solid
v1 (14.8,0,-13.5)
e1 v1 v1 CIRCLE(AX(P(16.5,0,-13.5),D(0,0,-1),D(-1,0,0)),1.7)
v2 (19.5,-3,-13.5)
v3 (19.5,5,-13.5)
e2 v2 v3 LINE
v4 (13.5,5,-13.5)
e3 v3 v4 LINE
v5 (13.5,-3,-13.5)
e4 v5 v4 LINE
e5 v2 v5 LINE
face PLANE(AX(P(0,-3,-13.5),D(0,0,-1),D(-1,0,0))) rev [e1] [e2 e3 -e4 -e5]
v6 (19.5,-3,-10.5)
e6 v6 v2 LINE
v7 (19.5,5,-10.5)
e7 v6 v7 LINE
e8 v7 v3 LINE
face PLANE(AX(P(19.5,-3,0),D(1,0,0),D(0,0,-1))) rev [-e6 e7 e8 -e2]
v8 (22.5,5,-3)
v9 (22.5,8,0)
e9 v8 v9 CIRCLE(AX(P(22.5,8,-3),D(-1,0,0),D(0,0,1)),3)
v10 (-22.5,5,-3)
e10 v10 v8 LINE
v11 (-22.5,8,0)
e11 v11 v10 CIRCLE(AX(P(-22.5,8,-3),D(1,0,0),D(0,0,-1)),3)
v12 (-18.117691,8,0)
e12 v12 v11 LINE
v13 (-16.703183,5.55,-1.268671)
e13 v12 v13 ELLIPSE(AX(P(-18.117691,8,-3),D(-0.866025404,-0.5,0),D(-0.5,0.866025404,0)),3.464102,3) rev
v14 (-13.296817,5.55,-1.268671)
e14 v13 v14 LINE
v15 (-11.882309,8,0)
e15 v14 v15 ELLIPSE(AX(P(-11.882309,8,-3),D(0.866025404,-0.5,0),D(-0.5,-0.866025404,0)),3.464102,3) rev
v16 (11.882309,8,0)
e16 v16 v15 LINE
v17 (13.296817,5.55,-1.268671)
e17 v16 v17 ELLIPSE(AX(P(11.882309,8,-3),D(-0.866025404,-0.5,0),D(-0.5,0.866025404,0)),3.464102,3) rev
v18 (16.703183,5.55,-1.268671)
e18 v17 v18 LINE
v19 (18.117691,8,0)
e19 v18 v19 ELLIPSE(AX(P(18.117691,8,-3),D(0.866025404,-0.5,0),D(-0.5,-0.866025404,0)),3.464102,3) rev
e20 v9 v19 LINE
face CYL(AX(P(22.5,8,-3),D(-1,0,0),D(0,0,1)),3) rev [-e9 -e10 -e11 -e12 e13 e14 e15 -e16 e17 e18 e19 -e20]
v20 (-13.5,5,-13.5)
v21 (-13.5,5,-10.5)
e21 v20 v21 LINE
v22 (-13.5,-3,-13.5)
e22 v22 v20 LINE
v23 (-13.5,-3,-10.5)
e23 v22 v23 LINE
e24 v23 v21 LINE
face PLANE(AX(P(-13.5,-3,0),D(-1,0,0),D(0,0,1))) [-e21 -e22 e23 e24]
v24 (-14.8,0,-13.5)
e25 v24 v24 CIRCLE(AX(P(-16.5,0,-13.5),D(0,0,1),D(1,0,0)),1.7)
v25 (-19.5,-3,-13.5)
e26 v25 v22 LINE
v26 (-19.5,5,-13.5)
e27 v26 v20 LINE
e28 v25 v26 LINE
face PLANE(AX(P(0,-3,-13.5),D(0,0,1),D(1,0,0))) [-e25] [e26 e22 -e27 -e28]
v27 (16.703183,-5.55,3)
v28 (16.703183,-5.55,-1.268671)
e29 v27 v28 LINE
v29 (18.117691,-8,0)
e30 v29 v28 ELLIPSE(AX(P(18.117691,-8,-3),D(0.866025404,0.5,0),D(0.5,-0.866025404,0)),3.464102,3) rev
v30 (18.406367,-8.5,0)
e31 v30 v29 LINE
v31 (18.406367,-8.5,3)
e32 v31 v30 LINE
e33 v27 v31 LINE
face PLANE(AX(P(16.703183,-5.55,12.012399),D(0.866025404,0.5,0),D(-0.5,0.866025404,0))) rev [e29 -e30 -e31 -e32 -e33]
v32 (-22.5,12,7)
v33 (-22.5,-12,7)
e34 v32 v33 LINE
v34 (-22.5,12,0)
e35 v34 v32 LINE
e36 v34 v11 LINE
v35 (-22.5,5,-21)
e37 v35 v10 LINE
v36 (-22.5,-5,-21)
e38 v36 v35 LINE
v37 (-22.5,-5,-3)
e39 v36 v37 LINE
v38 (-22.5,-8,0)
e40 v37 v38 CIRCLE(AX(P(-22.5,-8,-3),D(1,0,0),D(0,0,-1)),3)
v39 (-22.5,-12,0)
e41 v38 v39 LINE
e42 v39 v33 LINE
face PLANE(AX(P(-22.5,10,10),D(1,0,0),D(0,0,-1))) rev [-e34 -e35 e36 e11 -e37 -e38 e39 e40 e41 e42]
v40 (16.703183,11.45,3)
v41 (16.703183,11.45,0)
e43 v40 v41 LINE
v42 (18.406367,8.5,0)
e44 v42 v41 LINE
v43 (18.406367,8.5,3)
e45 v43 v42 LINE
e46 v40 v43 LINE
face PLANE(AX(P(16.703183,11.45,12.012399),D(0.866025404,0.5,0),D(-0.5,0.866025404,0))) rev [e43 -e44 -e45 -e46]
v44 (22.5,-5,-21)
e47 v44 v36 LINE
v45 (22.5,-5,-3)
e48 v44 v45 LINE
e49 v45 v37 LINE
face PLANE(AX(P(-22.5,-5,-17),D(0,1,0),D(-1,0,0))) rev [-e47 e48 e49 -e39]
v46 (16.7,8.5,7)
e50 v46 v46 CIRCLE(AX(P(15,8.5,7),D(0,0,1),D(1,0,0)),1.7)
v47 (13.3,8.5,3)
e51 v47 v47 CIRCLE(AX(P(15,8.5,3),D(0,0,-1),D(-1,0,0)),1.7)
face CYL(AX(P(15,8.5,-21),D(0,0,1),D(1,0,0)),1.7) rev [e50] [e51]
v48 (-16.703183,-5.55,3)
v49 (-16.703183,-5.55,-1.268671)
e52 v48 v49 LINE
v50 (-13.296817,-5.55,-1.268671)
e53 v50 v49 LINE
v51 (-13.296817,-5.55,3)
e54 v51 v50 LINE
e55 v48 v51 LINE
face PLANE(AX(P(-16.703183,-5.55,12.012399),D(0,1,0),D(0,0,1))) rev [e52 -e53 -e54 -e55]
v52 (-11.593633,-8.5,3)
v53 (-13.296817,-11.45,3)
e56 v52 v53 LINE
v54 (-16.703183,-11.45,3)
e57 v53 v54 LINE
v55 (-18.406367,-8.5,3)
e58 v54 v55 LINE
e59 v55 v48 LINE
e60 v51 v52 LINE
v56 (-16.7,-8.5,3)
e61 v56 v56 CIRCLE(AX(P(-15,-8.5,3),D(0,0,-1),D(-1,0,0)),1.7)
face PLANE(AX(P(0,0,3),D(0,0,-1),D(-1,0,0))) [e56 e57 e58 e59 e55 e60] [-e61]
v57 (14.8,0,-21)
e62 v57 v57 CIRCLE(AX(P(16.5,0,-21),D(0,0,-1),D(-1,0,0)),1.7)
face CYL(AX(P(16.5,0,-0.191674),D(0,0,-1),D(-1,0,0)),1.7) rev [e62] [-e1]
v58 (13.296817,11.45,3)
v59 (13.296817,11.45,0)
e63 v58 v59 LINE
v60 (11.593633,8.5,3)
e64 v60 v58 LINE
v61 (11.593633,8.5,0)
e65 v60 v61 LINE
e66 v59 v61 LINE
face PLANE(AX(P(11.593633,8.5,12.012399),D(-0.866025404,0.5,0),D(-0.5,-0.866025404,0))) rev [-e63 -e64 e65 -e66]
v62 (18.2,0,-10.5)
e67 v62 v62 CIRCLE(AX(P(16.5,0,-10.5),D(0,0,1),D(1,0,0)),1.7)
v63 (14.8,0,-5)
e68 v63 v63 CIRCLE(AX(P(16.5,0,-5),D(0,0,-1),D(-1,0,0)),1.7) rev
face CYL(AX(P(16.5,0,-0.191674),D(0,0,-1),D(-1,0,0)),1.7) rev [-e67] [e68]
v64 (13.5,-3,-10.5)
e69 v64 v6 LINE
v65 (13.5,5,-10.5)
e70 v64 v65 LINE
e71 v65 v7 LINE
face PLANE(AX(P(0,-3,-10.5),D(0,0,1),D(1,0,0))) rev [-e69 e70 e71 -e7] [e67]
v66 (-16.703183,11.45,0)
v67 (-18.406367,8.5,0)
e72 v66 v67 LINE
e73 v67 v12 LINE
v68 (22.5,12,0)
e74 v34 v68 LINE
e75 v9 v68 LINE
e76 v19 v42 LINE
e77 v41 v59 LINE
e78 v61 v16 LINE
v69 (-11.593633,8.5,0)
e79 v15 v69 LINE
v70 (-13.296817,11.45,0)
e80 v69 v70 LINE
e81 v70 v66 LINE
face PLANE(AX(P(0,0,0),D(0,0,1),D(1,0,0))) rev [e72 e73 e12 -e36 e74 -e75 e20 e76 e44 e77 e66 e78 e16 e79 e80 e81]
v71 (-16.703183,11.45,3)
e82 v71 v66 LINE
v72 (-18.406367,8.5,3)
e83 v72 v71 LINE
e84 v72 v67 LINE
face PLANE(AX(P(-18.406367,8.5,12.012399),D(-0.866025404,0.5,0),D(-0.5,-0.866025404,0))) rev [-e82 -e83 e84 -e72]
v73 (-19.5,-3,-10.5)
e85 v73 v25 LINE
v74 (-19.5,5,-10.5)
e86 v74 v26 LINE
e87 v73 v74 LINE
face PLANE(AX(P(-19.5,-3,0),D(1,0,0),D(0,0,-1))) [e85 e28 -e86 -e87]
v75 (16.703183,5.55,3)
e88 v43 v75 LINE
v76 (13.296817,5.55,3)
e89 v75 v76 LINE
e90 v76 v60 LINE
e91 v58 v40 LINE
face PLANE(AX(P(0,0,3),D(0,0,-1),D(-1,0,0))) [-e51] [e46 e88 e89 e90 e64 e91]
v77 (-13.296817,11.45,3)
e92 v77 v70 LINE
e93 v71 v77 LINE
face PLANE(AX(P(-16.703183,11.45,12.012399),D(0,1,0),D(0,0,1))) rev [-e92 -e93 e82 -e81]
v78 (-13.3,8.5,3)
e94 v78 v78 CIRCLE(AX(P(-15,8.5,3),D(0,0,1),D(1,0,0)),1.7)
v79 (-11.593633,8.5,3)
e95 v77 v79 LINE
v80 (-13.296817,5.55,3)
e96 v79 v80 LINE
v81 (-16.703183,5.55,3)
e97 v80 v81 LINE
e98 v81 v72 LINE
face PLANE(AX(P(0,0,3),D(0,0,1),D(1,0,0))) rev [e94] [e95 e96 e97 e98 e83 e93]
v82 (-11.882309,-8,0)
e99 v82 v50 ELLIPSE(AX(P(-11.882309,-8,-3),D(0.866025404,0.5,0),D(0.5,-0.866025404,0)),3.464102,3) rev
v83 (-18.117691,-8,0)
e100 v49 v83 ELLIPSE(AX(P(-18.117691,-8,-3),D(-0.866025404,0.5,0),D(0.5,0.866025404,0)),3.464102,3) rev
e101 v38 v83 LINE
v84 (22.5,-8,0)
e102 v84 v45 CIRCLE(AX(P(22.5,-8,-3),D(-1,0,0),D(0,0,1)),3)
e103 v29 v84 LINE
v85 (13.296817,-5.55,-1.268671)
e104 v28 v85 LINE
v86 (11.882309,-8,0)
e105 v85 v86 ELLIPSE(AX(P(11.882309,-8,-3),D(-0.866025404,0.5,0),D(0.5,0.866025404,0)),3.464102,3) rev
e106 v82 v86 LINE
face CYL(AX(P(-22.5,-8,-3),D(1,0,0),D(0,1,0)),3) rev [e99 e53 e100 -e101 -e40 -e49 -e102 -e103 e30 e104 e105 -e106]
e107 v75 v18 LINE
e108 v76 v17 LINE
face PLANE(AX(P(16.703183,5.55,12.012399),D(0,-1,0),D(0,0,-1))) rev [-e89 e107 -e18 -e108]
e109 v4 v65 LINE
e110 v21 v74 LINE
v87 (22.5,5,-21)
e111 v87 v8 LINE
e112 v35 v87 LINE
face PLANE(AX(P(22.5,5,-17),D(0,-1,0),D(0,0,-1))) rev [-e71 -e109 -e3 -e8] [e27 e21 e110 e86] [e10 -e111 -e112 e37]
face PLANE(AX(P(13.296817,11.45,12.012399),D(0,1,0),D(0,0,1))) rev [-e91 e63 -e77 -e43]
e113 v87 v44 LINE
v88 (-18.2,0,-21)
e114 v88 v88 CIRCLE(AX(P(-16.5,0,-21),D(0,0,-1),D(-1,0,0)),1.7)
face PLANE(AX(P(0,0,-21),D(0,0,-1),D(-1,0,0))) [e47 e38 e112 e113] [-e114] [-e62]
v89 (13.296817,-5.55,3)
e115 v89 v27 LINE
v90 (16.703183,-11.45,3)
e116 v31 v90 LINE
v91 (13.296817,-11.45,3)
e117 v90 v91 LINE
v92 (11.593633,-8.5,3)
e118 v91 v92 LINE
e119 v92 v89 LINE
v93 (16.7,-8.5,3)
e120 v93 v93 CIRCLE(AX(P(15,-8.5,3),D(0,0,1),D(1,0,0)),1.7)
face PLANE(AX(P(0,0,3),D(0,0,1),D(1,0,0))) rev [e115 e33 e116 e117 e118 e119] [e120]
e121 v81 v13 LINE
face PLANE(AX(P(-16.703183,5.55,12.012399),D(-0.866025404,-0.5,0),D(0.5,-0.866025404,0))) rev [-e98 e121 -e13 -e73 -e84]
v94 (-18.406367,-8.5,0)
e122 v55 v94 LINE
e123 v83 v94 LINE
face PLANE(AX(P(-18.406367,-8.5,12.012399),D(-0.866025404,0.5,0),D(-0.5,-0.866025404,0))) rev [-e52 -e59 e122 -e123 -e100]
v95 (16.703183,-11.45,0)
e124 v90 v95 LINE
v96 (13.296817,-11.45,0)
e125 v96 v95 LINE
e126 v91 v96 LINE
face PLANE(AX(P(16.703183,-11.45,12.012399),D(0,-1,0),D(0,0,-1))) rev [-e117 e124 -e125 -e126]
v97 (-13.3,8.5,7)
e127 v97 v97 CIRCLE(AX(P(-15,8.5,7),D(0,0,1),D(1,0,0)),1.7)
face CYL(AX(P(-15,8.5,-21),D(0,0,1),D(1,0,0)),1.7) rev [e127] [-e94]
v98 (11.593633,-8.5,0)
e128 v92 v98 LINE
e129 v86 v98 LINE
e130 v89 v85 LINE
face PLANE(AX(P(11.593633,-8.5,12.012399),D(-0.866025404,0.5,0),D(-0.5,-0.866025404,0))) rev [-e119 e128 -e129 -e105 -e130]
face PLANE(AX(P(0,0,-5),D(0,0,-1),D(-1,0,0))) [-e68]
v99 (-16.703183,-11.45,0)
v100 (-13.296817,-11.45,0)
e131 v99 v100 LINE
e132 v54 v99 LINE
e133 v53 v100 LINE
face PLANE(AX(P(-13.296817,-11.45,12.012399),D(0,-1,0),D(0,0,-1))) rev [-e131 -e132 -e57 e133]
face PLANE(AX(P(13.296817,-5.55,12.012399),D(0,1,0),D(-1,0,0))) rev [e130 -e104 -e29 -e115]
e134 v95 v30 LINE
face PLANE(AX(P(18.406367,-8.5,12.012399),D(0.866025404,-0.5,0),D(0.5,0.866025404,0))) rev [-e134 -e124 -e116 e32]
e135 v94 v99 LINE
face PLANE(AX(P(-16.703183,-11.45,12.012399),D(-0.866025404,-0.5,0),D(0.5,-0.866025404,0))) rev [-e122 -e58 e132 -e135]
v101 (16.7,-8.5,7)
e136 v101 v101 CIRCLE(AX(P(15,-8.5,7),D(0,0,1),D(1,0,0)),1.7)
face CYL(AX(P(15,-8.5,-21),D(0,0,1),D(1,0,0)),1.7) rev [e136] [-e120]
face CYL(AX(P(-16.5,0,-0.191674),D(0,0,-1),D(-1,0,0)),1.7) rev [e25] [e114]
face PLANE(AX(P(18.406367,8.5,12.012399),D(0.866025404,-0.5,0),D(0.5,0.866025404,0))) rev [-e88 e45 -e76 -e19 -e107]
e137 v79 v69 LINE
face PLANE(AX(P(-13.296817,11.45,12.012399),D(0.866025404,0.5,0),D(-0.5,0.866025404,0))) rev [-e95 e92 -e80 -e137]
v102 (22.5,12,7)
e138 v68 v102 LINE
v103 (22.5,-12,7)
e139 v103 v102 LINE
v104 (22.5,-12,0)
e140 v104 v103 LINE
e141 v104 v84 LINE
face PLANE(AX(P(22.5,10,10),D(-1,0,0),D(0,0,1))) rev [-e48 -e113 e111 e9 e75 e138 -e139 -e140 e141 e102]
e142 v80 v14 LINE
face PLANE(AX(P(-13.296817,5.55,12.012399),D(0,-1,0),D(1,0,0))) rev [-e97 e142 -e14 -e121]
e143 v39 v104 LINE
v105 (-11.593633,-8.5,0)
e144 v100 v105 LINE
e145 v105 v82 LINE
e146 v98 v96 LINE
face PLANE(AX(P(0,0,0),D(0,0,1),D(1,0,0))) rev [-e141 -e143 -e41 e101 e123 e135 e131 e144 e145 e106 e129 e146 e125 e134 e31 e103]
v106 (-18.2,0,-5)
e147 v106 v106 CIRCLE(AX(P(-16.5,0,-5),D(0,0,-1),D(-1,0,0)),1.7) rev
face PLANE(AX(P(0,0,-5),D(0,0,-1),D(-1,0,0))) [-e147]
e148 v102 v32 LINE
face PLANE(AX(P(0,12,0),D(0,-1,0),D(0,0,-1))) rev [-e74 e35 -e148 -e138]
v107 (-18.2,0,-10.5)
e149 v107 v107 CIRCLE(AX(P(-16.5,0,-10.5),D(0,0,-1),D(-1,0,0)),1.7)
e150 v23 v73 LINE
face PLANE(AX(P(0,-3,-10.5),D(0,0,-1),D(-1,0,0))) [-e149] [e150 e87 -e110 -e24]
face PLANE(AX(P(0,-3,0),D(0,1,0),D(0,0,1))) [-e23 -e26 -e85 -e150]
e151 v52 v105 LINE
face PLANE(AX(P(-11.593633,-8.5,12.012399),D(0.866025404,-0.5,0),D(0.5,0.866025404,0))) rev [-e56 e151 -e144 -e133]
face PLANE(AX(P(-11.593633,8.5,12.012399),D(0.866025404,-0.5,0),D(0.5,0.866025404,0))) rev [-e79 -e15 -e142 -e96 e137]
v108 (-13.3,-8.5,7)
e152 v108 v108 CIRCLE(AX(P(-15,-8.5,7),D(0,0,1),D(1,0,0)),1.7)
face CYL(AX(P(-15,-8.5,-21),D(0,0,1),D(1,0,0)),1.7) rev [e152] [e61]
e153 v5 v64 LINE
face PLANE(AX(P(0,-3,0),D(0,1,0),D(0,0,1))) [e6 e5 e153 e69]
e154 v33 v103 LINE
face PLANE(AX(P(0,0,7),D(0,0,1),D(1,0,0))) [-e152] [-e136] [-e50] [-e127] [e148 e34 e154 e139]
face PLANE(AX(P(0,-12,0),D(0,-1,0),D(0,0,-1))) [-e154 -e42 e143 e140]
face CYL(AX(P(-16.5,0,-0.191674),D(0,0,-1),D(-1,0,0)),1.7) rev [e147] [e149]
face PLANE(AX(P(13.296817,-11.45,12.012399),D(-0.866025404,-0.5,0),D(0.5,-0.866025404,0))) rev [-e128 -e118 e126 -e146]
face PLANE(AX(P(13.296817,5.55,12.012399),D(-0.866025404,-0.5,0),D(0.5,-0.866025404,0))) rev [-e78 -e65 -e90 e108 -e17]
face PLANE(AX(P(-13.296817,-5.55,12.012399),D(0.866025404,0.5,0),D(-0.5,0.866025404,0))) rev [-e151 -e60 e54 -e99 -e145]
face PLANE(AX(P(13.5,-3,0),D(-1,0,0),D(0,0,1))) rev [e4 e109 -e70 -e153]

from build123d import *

# Parameters (mm, degrees)
SKETCH_1_W          = 45
SKETCH_1_H          = 20
EXTRUDE_1_DEPTH     = 10
EXTRUDE_2_DEPTH     = 17
SKETCH_3_W          = 45
SKETCH_3_H          = 2
EXTRUDE_3_DEPTH     = 10
SKETCH_5_R          = 1.5
CUT_EXTRUDE_1_DEPTH = 31.647185841
CUT_EXTRUDE_3_DEPTH = 3
FILLET_4_R          = 3
FILLET_5_R          = 3
SKETCH_9_W          = 45
SKETCH_9_H          = 24
CUT_EXTRUDE_4_DEPTH = 3
SKETCH_10_W         = 45
SKETCH_10_H         = 10
EXTRUDE_4_DEPTH     = 3
SKETCH_12_R         = 1.55
CUT_EXTRUDE_5_DEPTH = 15
CUT_EXTRUDE_6_DEPTH = 8
EXTRUDE_START       = 1
SKETCH_15_W         = 45
SKETCH_15_H         = 10
SKETCH_15_R         = 1.55
EXTRUDE_5_DEPTH     = 1
SKETCH_16_R         = 1.7
CUT_EXTRUDE_7_DEPTH = 38.871493237
CUT_EXTRUDE_8_DEPTH = 24
CUT_EXTRUDE_9_REACH = 39.871
SKETCH_18_R         = 1.7


with BuildPart() as part:
    # Эскиз1 → Бобышка-Вытянуть1 (new body)
    with BuildSketch(Plane.XY):
        Rectangle(SKETCH_1_W, SKETCH_1_H)
    extrude(amount=EXTRUDE_1_DEPTH)

    # Эскиз2 → Бобышка-Вытянуть2 (add)
    with BuildSketch(Plane(origin=(0, 0, 0), x_dir=(-1, 0, 0), z_dir=(0, 0, -1))):
        Polygon((-22.5, 0), (-22.5, 5), (22.5, 5), (22.5, -5), (-22.5, -5), align=None)
    extrude(amount=EXTRUDE_2_DEPTH)

    # Эскиз3 → Бобышка-Вытянуть3 (add)
    with BuildSketch(Plane.XY.offset(10)):
        with Locations((0, 11)):
            Rectangle(SKETCH_3_W, SKETCH_3_H)
        with Locations((0, -11)):
            Rectangle(SKETCH_3_W, SKETCH_3_H)
    extrude(amount=-EXTRUDE_3_DEPTH)

    # Эскиз5 → Вырез-Вытянуть1 (cut, through all)
    with BuildSketch(Plane(origin=(0, 0, 0), x_dir=(-1, 0, 0), z_dir=(0, 0, -1))):
        with Locations((-15, 8.5)):
            Circle(SKETCH_5_R)
        with Locations((15, 8.5)):
            Circle(SKETCH_5_R)
        with Locations((15, -8.5)):
            Circle(SKETCH_5_R)
        with Locations((-15, -8.5)):
            Circle(SKETCH_5_R)
    extrude(amount=-CUT_EXTRUDE_1_DEPTH, mode=Mode.SUBTRACT)

    # Эскиз8 → Вырез-Вытянуть3 (cut)
    with BuildSketch(Plane(origin=(0, 0, 0), x_dir=(-1, 0, 0), z_dir=(0, 0, -1))):
        Polygon((-11.824573519, 8.5), (-13.41228676, 11.25), (-16.58771324, 11.25), (-18.175426481, 8.5), (-16.58771324, 5.75), (-13.41228676, 5.75), align=None)
        Polygon((-13.41228676, -5.75), (-11.824573519, -8.5), (-13.41228676, -11.25), (-16.58771324, -11.25), (-18.175426481, -8.5), (-16.58771324, -5.75), align=None)
        Polygon((11.824573519, -8.5), (13.41228676, -11.25), (16.58771324, -11.25), (18.175426481, -8.5), (16.58771324, -5.75), (13.41228676, -5.75), align=None)
        Polygon((13.41228676, 5.75), (11.824573519, 8.5), (13.41228676, 11.25), (16.58771324, 11.25), (18.175426481, 8.5), (16.58771324, 5.75), align=None)
    extrude(amount=-CUT_EXTRUDE_3_DEPTH, mode=Mode.SUBTRACT)

    # Скругление4
    # the kernel refuses this fillet: 3 mm, written as the material it adds along each edge
    with BuildSketch(Plane(origin=(22.5, 5, 0), x_dir=(0, 1, 0), z_dir=(-1, 0, 0))) as fillet_4_piece_1_section:
        with BuildLine():
            CenterArc((FILLET_4_R, FILLET_4_R), FILLET_4_R, 180, 90)
            Line((0, FILLET_4_R), (0, 0))
            Line((0, 0), (FILLET_4_R, 0))
        make_face()
    fillet_4_piece_1 = extrude(amount=52.5, mode=Mode.PRIVATE)
    fillet_4_piece_1 = split(fillet_4_piece_1, bisect_by=Plane(origin=(17.590792641, 7.487384486, -0.29904688), z_dir=(0.866025403784439, -0.49999999999999944, 0)), keep=Keep.TOP, mode=Mode.PRIVATE)
    add(fillet_4_piece_1)
    with BuildSketch(Plane(origin=(30, 5, 0), x_dir=(0, 1, 0), z_dir=(-1, 0, 0))) as fillet_4_piece_2_section:
        with BuildLine():
            CenterArc((FILLET_4_R, FILLET_4_R), FILLET_4_R, 180, 90)
            Line((0, FILLET_4_R), (0, 0))
            Line((0, 0), (FILLET_4_R, 0))
        make_face()
    fillet_4_piece_2 = extrude(amount=52.5, mode=Mode.PRIVATE)
    fillet_4_piece_2 = split(fillet_4_piece_2, bisect_by=Plane(origin=(16.011289033, 4.751603986, -0.863215568), z_dir=(-0.866025403784439, 0.49999999999999944, 0)), keep=Keep.TOP, mode=Mode.PRIVATE)
    fillet_4_piece_2 = split(fillet_4_piece_2, bisect_by=Plane(origin=(15, 5.75, -0.863215568), z_dir=(0, -1, 0)), keep=Keep.TOP, mode=Mode.PRIVATE)
    add(fillet_4_piece_2)
    with BuildSketch(Plane(origin=(30, 5, 0), x_dir=(0, 1, 0), z_dir=(-1, 0, 0))) as fillet_4_piece_3_section:
        with BuildLine():
            CenterArc((FILLET_4_R, FILLET_4_R), FILLET_4_R, 180, 90)
            Line((0, FILLET_4_R), (0, 0))
            Line((0, 0), (FILLET_4_R, 0))
        make_face()
    fillet_4_piece_3 = extrude(amount=60, mode=Mode.PRIVATE)
    fillet_4_piece_3 = split(fillet_4_piece_3, bisect_by=Plane(origin=(9.828179478, 11.957855912, -0.295719997), z_dir=(-0.8660254037844385, -0.5000000000000003, 0)), keep=Keep.TOP, mode=Mode.PRIVATE)
    fillet_4_piece_3 = split(fillet_4_piece_3, bisect_by=Plane(origin=(-9.828179478, 11.957855912, -0.295719997), z_dir=(0.8660254037844385, -0.5000000000000003, 0)), keep=Keep.TOP, mode=Mode.PRIVATE)
    add(fillet_4_piece_3)
    with BuildSketch(Plane(origin=(30, 5, 0), x_dir=(0, 1, 0), z_dir=(-1, 0, 0))) as fillet_4_piece_4_section:
        with BuildLine():
            CenterArc((FILLET_4_R, FILLET_4_R), FILLET_4_R, 180, 90)
            Line((0, FILLET_4_R), (0, 0))
            Line((0, 0), (FILLET_4_R, 0))
        make_face()
    fillet_4_piece_4 = extrude(amount=52.5, mode=Mode.PRIVATE)
    fillet_4_piece_4 = split(fillet_4_piece_4, bisect_by=Plane(origin=(-17.590792641, 7.487384486, -0.29904688), z_dir=(-0.866025403784439, -0.49999999999999944, 0)), keep=Keep.TOP, mode=Mode.PRIVATE)
    add(fillet_4_piece_4)

    # Скругление5
    # the kernel refuses this fillet: 3 mm, written as the material it adds along each edge
    with BuildSketch(Plane(origin=(-22.5, -5, 0), x_dir=(0, 0, -1), z_dir=(1, 0, 0))) as fillet_5_piece_1_section:
        with BuildLine():
            CenterArc((FILLET_5_R, -FILLET_5_R), FILLET_5_R, 90, 90)
            Line((0, -FILLET_5_R), (0, 0))
            Line((0, 0), (FILLET_5_R, 0))
        make_face()
    fillet_5_piece_1 = extrude(amount=45, mode=Mode.PRIVATE)
    fillet_5_piece_1 = split(fillet_5_piece_1, bisect_by=Plane(origin=(-19.417241341, -5.75, -0.889716038), z_dir=(0, 1, 0)), keep=Keep.TOP, mode=Mode.PRIVATE)
    add(fillet_5_piece_1)
    with BuildSketch(Plane(origin=(-22.5, -5, 0), x_dir=(0, 0, -1), z_dir=(1, 0, 0))) as fillet_5_piece_2_section:
        with BuildLine():
            CenterArc((FILLET_5_R, -FILLET_5_R), FILLET_5_R, 90, 90)
            Line((0, -FILLET_5_R), (0, 0))
            Line((0, 0), (FILLET_5_R, 0))
        make_face()
    fillet_5_piece_2 = extrude(amount=52.5, mode=Mode.PRIVATE)
    fillet_5_piece_2 = split(fillet_5_piece_2, bisect_by=Plane(origin=(-17.590792641, -7.487384486, -0.29904688), z_dir=(-0.866025403784439, 0.49999999999999944, 0)), keep=Keep.TOP, mode=Mode.PRIVATE)
    add(fillet_5_piece_2)
    with BuildSketch(Plane(origin=(-30, -5, 0), x_dir=(0, 0, -1), z_dir=(1, 0, 0))) as fillet_5_piece_3_section:
        with BuildLine():
            CenterArc((FILLET_5_R, -FILLET_5_R), FILLET_5_R, 90, 90)
            Line((0, -FILLET_5_R), (0, 0))
            Line((0, 0), (FILLET_5_R, 0))
        make_face()
    fillet_5_piece_3 = extrude(amount=60, mode=Mode.PRIVATE)
    fillet_5_piece_3 = split(fillet_5_piece_3, bisect_by=Plane(origin=(-9.828179478, -11.957855912, -0.295719997), z_dir=(0.8660254037844385, 0.5000000000000003, 0)), keep=Keep.TOP, mode=Mode.PRIVATE)
    fillet_5_piece_3 = split(fillet_5_piece_3, bisect_by=Plane(origin=(9.828179478, -11.957855912, -0.295719997), z_dir=(-0.8660254037844385, 0.5000000000000003, 0)), keep=Keep.TOP, mode=Mode.PRIVATE)
    add(fillet_5_piece_3)
    with BuildSketch(Plane(origin=(-30, -5, 0), x_dir=(0, 0, -1), z_dir=(1, 0, 0))) as fillet_5_piece_4_section:
        with BuildLine():
            CenterArc((FILLET_5_R, -FILLET_5_R), FILLET_5_R, 90, 90)
            Line((0, -FILLET_5_R), (0, 0))
            Line((0, 0), (FILLET_5_R, 0))
        make_face()
    fillet_5_piece_4 = extrude(amount=52.5, mode=Mode.PRIVATE)
    fillet_5_piece_4 = split(fillet_5_piece_4, bisect_by=Plane(origin=(17.590792641, -7.487384486, -0.29904688), z_dir=(0.866025403784439, 0.49999999999999944, 0)), keep=Keep.TOP, mode=Mode.PRIVATE)
    add(fillet_5_piece_4)

    # Эскиз9 → Вырез-Вытянуть4 (cut)
    with BuildSketch(Plane.XY.offset(10)):
        Rectangle(SKETCH_9_W, SKETCH_9_H)
    extrude(amount=-CUT_EXTRUDE_4_DEPTH, mode=Mode.SUBTRACT)

    # Эскиз10 → Бобышка-Вытянуть4 (add)
    with BuildSketch(Plane(origin=(0, 0, -17), x_dir=(-1, 0, 0), z_dir=(0, 0, -1))):
        Rectangle(SKETCH_10_W, SKETCH_10_H)
    extrude(amount=EXTRUDE_4_DEPTH)

    # Эскиз12 → Вырез-Вытянуть5 (cut)
    with BuildSketch(Plane(origin=(0, 0, -20), x_dir=(-1, 0, 0), z_dir=(0, 0, -1))):
        with Locations((-16.5, 0)):
            Circle(SKETCH_12_R)
        with Locations((16.5, 0)):
            Circle(SKETCH_12_R)
    extrude(amount=-CUT_EXTRUDE_5_DEPTH, mode=Mode.SUBTRACT)

    # Эскиз13 → Вырез-Вытянуть6 (cut)
    with BuildSketch(Plane(origin=(0, 5, 0), x_dir=(1, 0, 0), z_dir=(0, 1, 0))):
        Polygon((16.5, 13.5), (13.5, 13.5), (13.5, 10.5), (19.5, 10.5), (19.5, 13.5), align=None)
        Polygon((-19.5, 13.5), (-16.5, 13.5), (-13.5, 13.5), (-13.5, 10.5), (-19.5, 10.5), align=None)
    extrude(amount=-CUT_EXTRUDE_6_DEPTH, mode=Mode.SUBTRACT)

    # Эскиз15 → Бобышка-Вытянуть5 (add)
    with BuildSketch(Plane(origin=(0, 0, -20), x_dir=(-1, 0, 0), z_dir=(0, 0, -1)).offset(EXTRUDE_START)):
        Rectangle(SKETCH_15_W, SKETCH_15_H)
        with Locations((-16.5, 0)):
            Circle(SKETCH_15_R, mode=Mode.SUBTRACT)
        with Locations((16.5, 0)):
            Circle(SKETCH_15_R, mode=Mode.SUBTRACT)
    extrude(amount=-EXTRUDE_5_DEPTH)

    # Эскиз16 → Вырез-Вытянуть7 (cut, through all)
    with BuildSketch(Plane.XY.offset(7)):
        with Locations((15, -8.5)):
            Circle(SKETCH_16_R)
        with Locations((-15, -8.5)):
            Circle(SKETCH_16_R)
        with Locations((-15, 8.5)):
            Circle(SKETCH_16_R)
        with Locations((15, 8.5)):
            Circle(SKETCH_16_R)
    extrude(amount=-CUT_EXTRUDE_7_DEPTH, mode=Mode.SUBTRACT)

    # Эскиз17 → Вырез-Вытянуть8 (cut)
    with BuildSketch(Plane(origin=(0, 0, -21), x_dir=(-1, 0, 0), z_dir=(0, 0, -1))):
        Polygon((-13.296816706, 5.55), (-11.593633412, 8.5), (-13.296816706, 11.45), (-16.703183294, 11.45), (-18.406366588, 8.5), (-16.703183294, 5.55), align=None)
        Polygon((16.703183294, 5.55), (18.406366588, 8.5), (16.703183294, 11.45), (13.296816706, 11.45), (11.593633412, 8.5), (13.296816706, 5.55), align=None)
        Polygon((16.703183294, -11.45), (18.406366588, -8.5), (16.703183294, -5.55), (13.296816706, -5.55), (11.593633412, -8.5), (13.296816706, -11.45), align=None)
        Polygon((-13.296816706, -11.45), (-11.593633412, -8.5), (-13.296816706, -5.55), (-16.703183294, -5.55), (-18.406366588, -8.5), (-16.703183294, -11.45), align=None)
    extrude(amount=-CUT_EXTRUDE_8_DEPTH, mode=Mode.SUBTRACT)

    # Вырез-Вытянуть9: up to this face of the body (flat: up to its plane)
    cut_extrude_9_end = Plane(part.part.faces().sort_by_distance((16.5, 0, -5))[0])
    # Эскиз18 → Вырез-Вытянуть9 (cut, up to the picked face)
    with BuildSketch(Plane(origin=(0, 0, -21), x_dir=(-1, 0, 0), z_dir=(0, 0, -1)), mode=Mode.PRIVATE) as cut_extrude_9_sk1:
        with Locations((-16.5, 0)):
            Circle(SKETCH_18_R)
    cut_extrude_9_tool1 = split(extrude(cut_extrude_9_sk1.sketch, amount=-CUT_EXTRUDE_9_REACH, mode=Mode.PRIVATE), bisect_by=cut_extrude_9_end, keep=Keep.BOTH, mode=Mode.PRIVATE)
    # Эскиз18 → Вырез-Вытянуть9 (cut, up to the picked face)
    with BuildSketch(Plane(origin=(0, 0, -21), x_dir=(-1, 0, 0), z_dir=(0, 0, -1)), mode=Mode.PRIVATE) as cut_extrude_9_sk2:
        with Locations((16.5, 0)):
            Circle(SKETCH_18_R)
    cut_extrude_9_tool2 = split(extrude(cut_extrude_9_sk2.sketch, amount=-CUT_EXTRUDE_9_REACH, mode=Mode.PRIVATE), bisect_by=cut_extrude_9_end, keep=Keep.BOTH, mode=Mode.PRIVATE)
    add(cut_extrude_9_tool1.solids().sort_by(Axis((16.5, 0, -21), (0, 0, 1)))[0], mode=Mode.SUBTRACT)
    add(cut_extrude_9_tool2.solids().sort_by(Axis((-16.5, 0, -21), (0, 0, 1)))[0], mode=Mode.SUBTRACT)


solid = part.part
